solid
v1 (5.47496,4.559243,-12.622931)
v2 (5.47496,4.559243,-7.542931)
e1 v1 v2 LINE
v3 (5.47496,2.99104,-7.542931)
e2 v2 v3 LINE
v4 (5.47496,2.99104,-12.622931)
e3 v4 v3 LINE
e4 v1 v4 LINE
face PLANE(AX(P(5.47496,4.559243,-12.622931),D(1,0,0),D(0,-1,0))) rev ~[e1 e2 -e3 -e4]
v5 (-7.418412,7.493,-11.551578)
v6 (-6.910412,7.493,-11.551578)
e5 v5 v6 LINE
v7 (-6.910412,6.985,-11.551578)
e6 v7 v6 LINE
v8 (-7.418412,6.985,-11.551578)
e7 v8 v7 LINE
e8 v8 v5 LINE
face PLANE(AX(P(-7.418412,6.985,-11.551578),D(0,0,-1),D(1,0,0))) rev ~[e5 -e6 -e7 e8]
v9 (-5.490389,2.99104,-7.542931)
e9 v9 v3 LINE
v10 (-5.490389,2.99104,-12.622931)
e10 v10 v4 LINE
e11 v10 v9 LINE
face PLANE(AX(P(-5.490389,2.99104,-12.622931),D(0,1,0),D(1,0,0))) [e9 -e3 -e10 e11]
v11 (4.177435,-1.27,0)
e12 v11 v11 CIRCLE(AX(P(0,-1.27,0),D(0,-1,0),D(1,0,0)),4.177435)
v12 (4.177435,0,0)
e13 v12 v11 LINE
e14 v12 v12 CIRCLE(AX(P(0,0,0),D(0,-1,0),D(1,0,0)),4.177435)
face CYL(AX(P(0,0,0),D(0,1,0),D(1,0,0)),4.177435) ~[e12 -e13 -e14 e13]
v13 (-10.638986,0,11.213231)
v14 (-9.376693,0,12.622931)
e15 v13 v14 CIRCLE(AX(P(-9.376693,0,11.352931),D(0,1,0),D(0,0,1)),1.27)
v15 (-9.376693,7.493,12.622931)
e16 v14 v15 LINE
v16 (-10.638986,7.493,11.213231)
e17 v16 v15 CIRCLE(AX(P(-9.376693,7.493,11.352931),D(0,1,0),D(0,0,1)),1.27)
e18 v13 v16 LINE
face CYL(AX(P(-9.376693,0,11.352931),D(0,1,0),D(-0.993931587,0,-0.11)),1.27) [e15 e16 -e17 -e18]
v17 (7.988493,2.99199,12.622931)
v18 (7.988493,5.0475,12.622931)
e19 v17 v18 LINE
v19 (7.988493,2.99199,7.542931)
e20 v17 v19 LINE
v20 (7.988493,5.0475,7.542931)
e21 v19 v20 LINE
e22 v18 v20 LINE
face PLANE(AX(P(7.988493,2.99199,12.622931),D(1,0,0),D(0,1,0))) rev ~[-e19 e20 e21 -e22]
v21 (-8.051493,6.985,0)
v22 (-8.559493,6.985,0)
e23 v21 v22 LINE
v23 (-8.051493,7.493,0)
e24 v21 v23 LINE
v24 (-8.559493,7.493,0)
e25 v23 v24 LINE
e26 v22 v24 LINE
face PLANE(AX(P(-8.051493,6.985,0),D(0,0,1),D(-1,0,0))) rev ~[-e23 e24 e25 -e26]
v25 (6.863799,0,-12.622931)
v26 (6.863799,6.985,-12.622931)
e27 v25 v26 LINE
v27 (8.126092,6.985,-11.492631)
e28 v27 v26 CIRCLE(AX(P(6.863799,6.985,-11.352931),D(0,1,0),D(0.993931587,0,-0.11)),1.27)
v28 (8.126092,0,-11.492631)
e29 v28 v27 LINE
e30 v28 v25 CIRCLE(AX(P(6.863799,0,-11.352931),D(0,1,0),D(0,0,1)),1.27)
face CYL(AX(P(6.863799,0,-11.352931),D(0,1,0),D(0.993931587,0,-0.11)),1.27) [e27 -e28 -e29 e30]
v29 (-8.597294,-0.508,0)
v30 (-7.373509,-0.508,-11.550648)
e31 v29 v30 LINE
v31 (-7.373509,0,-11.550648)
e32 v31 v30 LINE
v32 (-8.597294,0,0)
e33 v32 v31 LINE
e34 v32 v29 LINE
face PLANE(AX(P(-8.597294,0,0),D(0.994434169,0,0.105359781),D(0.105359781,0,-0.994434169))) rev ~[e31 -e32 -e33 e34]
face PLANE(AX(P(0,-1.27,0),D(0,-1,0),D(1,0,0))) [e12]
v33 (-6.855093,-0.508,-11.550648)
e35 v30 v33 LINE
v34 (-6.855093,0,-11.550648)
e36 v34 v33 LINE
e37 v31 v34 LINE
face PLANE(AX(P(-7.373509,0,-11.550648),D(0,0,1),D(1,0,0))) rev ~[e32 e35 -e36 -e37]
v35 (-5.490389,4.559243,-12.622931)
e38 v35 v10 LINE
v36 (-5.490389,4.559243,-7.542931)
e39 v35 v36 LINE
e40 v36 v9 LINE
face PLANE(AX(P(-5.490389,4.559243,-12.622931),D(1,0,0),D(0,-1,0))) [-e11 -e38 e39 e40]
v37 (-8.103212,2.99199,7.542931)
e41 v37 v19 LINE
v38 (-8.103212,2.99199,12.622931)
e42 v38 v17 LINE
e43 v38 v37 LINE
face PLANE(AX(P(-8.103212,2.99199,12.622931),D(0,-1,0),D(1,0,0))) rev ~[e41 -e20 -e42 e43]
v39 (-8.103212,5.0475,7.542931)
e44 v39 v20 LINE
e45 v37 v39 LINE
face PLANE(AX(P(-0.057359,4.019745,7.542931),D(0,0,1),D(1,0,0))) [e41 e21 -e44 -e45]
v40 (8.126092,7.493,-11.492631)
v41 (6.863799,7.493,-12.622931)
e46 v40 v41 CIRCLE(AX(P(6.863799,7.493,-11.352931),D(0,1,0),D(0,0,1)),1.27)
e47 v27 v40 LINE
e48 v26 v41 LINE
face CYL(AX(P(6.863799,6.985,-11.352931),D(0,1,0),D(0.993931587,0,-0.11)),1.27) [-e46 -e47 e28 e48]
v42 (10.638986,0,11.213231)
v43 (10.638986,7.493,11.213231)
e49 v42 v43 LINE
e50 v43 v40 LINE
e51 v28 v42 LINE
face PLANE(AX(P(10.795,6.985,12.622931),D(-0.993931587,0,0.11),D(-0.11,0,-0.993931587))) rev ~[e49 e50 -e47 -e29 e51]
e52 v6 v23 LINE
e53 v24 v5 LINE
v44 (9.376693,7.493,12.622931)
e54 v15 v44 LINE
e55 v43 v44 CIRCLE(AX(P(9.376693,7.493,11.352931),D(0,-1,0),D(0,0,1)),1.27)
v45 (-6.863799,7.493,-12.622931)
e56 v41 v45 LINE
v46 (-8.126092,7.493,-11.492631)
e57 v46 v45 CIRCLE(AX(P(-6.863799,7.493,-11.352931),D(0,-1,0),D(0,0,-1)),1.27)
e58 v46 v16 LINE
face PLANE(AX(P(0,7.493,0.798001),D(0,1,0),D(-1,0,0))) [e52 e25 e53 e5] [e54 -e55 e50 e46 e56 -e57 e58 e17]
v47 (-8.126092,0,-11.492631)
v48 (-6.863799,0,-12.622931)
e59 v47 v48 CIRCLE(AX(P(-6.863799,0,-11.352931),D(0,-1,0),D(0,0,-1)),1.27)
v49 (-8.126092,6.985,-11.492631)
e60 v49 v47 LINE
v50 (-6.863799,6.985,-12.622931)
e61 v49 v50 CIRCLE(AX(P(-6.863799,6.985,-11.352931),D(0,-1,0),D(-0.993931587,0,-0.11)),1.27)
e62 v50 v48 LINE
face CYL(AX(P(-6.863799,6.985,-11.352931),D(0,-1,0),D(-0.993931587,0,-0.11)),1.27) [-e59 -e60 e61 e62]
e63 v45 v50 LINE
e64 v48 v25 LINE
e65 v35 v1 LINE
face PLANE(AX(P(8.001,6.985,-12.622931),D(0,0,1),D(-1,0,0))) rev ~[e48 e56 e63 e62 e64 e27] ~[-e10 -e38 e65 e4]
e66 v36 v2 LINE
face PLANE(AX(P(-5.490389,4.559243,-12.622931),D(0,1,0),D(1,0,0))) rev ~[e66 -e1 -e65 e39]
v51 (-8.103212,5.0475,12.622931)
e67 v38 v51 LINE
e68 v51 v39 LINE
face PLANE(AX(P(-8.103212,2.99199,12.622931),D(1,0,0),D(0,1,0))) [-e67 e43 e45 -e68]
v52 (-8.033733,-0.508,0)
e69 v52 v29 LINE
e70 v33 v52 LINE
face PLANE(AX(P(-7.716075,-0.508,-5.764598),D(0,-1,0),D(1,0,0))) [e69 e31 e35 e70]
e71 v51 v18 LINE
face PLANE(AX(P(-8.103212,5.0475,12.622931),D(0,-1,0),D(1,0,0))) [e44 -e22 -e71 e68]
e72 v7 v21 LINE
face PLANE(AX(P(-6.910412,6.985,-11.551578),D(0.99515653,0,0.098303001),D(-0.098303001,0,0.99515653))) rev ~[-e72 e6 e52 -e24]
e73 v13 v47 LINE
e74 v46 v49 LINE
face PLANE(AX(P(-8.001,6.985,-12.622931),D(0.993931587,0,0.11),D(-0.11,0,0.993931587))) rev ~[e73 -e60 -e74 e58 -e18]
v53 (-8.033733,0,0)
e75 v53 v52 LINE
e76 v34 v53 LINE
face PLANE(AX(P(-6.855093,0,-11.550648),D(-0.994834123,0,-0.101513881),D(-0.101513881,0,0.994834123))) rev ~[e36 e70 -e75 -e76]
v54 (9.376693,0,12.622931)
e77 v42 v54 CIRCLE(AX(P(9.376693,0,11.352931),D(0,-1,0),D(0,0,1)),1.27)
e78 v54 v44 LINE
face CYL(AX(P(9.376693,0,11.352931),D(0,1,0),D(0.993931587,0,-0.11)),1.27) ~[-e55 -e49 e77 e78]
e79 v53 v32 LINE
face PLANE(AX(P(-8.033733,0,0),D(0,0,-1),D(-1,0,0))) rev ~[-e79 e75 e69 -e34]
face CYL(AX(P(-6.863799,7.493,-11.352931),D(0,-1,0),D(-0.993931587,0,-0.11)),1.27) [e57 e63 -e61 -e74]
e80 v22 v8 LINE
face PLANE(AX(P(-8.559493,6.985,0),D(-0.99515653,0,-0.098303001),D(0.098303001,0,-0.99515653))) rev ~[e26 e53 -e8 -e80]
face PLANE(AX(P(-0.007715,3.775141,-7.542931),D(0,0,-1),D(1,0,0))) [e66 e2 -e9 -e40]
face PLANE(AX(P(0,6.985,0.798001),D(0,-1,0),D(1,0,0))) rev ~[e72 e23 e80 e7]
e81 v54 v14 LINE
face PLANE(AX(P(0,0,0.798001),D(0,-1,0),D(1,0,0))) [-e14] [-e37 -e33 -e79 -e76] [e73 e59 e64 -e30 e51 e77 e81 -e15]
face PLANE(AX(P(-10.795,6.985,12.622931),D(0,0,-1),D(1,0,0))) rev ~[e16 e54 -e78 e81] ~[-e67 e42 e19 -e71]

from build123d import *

# Parameters (mm, degrees)
F1_DEPTH   = 6.985
F2_R       = 4.1774350827
F3_DEPTH   = 1.27
F6_DEPTH   = 0.508
F8_DEPTH   = 0.508
F9_R       = 1.27
F10_W      = 16.0917048343
F10_H      = 2.0555099472
F8_FACE1_W = 13.7275979897
F8_FACE1_H = 7.493
F11_DEPTH  = 5.08
F12_W      = 10.965348687
F12_H      = 1.5682033263
F13_DEPTH  = 5.08


# Not quite as in the source:
# - a feature names something its author has since deleted; it is built from what else it names


with BuildPart() as f1:
    # F0 (on Front) → F1 (new body)
    with BuildSketch(Plane.XZ):
        Polygon((10.795, 12.6229311572), (-10.795, 12.6229311572), (-8.001, -12.6229311572), (8.001, -12.6229311572), align=None)
    extrude(amount=-F1_DEPTH)

    # F2 (on face) → F3 (join)
    with BuildSketch(Plane.XZ):
        Circle(F2_R)
    extrude(amount=F3_DEPTH)

    # F5 (on face) + F1_face1 (on face) → F6 (join)
    with BuildSketch(Plane.XZ):
        Polygon((-8.0337325091, 0), (-8.597294162, 0), (-7.3735090208, -11.5506481379), (-6.855092685, -11.5506481379), align=None)
    with BuildSketch(Plane(origin=(0, 6.985, 0.6254605528), x_dir=(1, 0, 0), z_dir=(0, 1, 0))):
        Polygon((-10.795, -11.9974706044), (10.795, -11.9974706044), (8.001, 13.2483917101), (-8.001, 13.2483917101), align=None)
    extrude(amount=F6_DEPTH, dir=(0, -1, 0))

    # F7 (on face) → F8 (join)
    with BuildSketch(Plane(origin=(0, 6.985, 0), x_dir=(-1, 0, 0), z_dir=(0, 1, 0))):
        Polygon((8.001, -12.6229311572), (10.795, 12.6229311572), (-10.795, 12.6229311572), (-8.001, -12.6229311572), align=None)
        Polygon((8.051493348, 0), (8.559493348, 0), (7.418411777, -11.551577974), (6.910411777, -11.551577974), align=None, mode=Mode.SUBTRACT)
    extrude(amount=F8_DEPTH)

    # F9
    f9_edges = [f1.edges().sort_by_distance(p)[0] for p in [
        (-10.795, 3.7465, 12.622931),
        (10.795, 3.7465, 12.622931),
        (8.001, 3.7465, -12.622931),
        (-8.001, 3.7465, -12.622931),
    ]]
    fillet(f9_edges, radius=F9_R)

    # F10 (on face) + F8_face1 (on face) → F11 (cut)
    with BuildSketch(Plane.XY.offset(12.6229311572)):
        with Locations((-0.0573594589, 4.0197446942)):
            Rectangle(F10_W, F10_H)
    with BuildSketch(Plane(origin=(0, 3.7465, -12.6229311572), x_dir=(1, 0, 0), z_dir=(0, 0, -1))):
        Rectangle(F8_FACE1_W, F8_FACE1_H)
    extrude(amount=-F11_DEPTH, dir=(0, 0, 1), mode=Mode.SUBTRACT)

    # F12 (on face) → F13 (cut)
    with BuildSketch(Plane(origin=(0, 0, -12.6229311572), x_dir=(1, 0, 0), z_dir=(0, 0, -1))):
        with Locations((-0.0077148434, -3.7751414347)):
            Rectangle(F12_W, F12_H)
    extrude(amount=-F13_DEPTH, mode=Mode.SUBTRACT)


solid = f1.part
